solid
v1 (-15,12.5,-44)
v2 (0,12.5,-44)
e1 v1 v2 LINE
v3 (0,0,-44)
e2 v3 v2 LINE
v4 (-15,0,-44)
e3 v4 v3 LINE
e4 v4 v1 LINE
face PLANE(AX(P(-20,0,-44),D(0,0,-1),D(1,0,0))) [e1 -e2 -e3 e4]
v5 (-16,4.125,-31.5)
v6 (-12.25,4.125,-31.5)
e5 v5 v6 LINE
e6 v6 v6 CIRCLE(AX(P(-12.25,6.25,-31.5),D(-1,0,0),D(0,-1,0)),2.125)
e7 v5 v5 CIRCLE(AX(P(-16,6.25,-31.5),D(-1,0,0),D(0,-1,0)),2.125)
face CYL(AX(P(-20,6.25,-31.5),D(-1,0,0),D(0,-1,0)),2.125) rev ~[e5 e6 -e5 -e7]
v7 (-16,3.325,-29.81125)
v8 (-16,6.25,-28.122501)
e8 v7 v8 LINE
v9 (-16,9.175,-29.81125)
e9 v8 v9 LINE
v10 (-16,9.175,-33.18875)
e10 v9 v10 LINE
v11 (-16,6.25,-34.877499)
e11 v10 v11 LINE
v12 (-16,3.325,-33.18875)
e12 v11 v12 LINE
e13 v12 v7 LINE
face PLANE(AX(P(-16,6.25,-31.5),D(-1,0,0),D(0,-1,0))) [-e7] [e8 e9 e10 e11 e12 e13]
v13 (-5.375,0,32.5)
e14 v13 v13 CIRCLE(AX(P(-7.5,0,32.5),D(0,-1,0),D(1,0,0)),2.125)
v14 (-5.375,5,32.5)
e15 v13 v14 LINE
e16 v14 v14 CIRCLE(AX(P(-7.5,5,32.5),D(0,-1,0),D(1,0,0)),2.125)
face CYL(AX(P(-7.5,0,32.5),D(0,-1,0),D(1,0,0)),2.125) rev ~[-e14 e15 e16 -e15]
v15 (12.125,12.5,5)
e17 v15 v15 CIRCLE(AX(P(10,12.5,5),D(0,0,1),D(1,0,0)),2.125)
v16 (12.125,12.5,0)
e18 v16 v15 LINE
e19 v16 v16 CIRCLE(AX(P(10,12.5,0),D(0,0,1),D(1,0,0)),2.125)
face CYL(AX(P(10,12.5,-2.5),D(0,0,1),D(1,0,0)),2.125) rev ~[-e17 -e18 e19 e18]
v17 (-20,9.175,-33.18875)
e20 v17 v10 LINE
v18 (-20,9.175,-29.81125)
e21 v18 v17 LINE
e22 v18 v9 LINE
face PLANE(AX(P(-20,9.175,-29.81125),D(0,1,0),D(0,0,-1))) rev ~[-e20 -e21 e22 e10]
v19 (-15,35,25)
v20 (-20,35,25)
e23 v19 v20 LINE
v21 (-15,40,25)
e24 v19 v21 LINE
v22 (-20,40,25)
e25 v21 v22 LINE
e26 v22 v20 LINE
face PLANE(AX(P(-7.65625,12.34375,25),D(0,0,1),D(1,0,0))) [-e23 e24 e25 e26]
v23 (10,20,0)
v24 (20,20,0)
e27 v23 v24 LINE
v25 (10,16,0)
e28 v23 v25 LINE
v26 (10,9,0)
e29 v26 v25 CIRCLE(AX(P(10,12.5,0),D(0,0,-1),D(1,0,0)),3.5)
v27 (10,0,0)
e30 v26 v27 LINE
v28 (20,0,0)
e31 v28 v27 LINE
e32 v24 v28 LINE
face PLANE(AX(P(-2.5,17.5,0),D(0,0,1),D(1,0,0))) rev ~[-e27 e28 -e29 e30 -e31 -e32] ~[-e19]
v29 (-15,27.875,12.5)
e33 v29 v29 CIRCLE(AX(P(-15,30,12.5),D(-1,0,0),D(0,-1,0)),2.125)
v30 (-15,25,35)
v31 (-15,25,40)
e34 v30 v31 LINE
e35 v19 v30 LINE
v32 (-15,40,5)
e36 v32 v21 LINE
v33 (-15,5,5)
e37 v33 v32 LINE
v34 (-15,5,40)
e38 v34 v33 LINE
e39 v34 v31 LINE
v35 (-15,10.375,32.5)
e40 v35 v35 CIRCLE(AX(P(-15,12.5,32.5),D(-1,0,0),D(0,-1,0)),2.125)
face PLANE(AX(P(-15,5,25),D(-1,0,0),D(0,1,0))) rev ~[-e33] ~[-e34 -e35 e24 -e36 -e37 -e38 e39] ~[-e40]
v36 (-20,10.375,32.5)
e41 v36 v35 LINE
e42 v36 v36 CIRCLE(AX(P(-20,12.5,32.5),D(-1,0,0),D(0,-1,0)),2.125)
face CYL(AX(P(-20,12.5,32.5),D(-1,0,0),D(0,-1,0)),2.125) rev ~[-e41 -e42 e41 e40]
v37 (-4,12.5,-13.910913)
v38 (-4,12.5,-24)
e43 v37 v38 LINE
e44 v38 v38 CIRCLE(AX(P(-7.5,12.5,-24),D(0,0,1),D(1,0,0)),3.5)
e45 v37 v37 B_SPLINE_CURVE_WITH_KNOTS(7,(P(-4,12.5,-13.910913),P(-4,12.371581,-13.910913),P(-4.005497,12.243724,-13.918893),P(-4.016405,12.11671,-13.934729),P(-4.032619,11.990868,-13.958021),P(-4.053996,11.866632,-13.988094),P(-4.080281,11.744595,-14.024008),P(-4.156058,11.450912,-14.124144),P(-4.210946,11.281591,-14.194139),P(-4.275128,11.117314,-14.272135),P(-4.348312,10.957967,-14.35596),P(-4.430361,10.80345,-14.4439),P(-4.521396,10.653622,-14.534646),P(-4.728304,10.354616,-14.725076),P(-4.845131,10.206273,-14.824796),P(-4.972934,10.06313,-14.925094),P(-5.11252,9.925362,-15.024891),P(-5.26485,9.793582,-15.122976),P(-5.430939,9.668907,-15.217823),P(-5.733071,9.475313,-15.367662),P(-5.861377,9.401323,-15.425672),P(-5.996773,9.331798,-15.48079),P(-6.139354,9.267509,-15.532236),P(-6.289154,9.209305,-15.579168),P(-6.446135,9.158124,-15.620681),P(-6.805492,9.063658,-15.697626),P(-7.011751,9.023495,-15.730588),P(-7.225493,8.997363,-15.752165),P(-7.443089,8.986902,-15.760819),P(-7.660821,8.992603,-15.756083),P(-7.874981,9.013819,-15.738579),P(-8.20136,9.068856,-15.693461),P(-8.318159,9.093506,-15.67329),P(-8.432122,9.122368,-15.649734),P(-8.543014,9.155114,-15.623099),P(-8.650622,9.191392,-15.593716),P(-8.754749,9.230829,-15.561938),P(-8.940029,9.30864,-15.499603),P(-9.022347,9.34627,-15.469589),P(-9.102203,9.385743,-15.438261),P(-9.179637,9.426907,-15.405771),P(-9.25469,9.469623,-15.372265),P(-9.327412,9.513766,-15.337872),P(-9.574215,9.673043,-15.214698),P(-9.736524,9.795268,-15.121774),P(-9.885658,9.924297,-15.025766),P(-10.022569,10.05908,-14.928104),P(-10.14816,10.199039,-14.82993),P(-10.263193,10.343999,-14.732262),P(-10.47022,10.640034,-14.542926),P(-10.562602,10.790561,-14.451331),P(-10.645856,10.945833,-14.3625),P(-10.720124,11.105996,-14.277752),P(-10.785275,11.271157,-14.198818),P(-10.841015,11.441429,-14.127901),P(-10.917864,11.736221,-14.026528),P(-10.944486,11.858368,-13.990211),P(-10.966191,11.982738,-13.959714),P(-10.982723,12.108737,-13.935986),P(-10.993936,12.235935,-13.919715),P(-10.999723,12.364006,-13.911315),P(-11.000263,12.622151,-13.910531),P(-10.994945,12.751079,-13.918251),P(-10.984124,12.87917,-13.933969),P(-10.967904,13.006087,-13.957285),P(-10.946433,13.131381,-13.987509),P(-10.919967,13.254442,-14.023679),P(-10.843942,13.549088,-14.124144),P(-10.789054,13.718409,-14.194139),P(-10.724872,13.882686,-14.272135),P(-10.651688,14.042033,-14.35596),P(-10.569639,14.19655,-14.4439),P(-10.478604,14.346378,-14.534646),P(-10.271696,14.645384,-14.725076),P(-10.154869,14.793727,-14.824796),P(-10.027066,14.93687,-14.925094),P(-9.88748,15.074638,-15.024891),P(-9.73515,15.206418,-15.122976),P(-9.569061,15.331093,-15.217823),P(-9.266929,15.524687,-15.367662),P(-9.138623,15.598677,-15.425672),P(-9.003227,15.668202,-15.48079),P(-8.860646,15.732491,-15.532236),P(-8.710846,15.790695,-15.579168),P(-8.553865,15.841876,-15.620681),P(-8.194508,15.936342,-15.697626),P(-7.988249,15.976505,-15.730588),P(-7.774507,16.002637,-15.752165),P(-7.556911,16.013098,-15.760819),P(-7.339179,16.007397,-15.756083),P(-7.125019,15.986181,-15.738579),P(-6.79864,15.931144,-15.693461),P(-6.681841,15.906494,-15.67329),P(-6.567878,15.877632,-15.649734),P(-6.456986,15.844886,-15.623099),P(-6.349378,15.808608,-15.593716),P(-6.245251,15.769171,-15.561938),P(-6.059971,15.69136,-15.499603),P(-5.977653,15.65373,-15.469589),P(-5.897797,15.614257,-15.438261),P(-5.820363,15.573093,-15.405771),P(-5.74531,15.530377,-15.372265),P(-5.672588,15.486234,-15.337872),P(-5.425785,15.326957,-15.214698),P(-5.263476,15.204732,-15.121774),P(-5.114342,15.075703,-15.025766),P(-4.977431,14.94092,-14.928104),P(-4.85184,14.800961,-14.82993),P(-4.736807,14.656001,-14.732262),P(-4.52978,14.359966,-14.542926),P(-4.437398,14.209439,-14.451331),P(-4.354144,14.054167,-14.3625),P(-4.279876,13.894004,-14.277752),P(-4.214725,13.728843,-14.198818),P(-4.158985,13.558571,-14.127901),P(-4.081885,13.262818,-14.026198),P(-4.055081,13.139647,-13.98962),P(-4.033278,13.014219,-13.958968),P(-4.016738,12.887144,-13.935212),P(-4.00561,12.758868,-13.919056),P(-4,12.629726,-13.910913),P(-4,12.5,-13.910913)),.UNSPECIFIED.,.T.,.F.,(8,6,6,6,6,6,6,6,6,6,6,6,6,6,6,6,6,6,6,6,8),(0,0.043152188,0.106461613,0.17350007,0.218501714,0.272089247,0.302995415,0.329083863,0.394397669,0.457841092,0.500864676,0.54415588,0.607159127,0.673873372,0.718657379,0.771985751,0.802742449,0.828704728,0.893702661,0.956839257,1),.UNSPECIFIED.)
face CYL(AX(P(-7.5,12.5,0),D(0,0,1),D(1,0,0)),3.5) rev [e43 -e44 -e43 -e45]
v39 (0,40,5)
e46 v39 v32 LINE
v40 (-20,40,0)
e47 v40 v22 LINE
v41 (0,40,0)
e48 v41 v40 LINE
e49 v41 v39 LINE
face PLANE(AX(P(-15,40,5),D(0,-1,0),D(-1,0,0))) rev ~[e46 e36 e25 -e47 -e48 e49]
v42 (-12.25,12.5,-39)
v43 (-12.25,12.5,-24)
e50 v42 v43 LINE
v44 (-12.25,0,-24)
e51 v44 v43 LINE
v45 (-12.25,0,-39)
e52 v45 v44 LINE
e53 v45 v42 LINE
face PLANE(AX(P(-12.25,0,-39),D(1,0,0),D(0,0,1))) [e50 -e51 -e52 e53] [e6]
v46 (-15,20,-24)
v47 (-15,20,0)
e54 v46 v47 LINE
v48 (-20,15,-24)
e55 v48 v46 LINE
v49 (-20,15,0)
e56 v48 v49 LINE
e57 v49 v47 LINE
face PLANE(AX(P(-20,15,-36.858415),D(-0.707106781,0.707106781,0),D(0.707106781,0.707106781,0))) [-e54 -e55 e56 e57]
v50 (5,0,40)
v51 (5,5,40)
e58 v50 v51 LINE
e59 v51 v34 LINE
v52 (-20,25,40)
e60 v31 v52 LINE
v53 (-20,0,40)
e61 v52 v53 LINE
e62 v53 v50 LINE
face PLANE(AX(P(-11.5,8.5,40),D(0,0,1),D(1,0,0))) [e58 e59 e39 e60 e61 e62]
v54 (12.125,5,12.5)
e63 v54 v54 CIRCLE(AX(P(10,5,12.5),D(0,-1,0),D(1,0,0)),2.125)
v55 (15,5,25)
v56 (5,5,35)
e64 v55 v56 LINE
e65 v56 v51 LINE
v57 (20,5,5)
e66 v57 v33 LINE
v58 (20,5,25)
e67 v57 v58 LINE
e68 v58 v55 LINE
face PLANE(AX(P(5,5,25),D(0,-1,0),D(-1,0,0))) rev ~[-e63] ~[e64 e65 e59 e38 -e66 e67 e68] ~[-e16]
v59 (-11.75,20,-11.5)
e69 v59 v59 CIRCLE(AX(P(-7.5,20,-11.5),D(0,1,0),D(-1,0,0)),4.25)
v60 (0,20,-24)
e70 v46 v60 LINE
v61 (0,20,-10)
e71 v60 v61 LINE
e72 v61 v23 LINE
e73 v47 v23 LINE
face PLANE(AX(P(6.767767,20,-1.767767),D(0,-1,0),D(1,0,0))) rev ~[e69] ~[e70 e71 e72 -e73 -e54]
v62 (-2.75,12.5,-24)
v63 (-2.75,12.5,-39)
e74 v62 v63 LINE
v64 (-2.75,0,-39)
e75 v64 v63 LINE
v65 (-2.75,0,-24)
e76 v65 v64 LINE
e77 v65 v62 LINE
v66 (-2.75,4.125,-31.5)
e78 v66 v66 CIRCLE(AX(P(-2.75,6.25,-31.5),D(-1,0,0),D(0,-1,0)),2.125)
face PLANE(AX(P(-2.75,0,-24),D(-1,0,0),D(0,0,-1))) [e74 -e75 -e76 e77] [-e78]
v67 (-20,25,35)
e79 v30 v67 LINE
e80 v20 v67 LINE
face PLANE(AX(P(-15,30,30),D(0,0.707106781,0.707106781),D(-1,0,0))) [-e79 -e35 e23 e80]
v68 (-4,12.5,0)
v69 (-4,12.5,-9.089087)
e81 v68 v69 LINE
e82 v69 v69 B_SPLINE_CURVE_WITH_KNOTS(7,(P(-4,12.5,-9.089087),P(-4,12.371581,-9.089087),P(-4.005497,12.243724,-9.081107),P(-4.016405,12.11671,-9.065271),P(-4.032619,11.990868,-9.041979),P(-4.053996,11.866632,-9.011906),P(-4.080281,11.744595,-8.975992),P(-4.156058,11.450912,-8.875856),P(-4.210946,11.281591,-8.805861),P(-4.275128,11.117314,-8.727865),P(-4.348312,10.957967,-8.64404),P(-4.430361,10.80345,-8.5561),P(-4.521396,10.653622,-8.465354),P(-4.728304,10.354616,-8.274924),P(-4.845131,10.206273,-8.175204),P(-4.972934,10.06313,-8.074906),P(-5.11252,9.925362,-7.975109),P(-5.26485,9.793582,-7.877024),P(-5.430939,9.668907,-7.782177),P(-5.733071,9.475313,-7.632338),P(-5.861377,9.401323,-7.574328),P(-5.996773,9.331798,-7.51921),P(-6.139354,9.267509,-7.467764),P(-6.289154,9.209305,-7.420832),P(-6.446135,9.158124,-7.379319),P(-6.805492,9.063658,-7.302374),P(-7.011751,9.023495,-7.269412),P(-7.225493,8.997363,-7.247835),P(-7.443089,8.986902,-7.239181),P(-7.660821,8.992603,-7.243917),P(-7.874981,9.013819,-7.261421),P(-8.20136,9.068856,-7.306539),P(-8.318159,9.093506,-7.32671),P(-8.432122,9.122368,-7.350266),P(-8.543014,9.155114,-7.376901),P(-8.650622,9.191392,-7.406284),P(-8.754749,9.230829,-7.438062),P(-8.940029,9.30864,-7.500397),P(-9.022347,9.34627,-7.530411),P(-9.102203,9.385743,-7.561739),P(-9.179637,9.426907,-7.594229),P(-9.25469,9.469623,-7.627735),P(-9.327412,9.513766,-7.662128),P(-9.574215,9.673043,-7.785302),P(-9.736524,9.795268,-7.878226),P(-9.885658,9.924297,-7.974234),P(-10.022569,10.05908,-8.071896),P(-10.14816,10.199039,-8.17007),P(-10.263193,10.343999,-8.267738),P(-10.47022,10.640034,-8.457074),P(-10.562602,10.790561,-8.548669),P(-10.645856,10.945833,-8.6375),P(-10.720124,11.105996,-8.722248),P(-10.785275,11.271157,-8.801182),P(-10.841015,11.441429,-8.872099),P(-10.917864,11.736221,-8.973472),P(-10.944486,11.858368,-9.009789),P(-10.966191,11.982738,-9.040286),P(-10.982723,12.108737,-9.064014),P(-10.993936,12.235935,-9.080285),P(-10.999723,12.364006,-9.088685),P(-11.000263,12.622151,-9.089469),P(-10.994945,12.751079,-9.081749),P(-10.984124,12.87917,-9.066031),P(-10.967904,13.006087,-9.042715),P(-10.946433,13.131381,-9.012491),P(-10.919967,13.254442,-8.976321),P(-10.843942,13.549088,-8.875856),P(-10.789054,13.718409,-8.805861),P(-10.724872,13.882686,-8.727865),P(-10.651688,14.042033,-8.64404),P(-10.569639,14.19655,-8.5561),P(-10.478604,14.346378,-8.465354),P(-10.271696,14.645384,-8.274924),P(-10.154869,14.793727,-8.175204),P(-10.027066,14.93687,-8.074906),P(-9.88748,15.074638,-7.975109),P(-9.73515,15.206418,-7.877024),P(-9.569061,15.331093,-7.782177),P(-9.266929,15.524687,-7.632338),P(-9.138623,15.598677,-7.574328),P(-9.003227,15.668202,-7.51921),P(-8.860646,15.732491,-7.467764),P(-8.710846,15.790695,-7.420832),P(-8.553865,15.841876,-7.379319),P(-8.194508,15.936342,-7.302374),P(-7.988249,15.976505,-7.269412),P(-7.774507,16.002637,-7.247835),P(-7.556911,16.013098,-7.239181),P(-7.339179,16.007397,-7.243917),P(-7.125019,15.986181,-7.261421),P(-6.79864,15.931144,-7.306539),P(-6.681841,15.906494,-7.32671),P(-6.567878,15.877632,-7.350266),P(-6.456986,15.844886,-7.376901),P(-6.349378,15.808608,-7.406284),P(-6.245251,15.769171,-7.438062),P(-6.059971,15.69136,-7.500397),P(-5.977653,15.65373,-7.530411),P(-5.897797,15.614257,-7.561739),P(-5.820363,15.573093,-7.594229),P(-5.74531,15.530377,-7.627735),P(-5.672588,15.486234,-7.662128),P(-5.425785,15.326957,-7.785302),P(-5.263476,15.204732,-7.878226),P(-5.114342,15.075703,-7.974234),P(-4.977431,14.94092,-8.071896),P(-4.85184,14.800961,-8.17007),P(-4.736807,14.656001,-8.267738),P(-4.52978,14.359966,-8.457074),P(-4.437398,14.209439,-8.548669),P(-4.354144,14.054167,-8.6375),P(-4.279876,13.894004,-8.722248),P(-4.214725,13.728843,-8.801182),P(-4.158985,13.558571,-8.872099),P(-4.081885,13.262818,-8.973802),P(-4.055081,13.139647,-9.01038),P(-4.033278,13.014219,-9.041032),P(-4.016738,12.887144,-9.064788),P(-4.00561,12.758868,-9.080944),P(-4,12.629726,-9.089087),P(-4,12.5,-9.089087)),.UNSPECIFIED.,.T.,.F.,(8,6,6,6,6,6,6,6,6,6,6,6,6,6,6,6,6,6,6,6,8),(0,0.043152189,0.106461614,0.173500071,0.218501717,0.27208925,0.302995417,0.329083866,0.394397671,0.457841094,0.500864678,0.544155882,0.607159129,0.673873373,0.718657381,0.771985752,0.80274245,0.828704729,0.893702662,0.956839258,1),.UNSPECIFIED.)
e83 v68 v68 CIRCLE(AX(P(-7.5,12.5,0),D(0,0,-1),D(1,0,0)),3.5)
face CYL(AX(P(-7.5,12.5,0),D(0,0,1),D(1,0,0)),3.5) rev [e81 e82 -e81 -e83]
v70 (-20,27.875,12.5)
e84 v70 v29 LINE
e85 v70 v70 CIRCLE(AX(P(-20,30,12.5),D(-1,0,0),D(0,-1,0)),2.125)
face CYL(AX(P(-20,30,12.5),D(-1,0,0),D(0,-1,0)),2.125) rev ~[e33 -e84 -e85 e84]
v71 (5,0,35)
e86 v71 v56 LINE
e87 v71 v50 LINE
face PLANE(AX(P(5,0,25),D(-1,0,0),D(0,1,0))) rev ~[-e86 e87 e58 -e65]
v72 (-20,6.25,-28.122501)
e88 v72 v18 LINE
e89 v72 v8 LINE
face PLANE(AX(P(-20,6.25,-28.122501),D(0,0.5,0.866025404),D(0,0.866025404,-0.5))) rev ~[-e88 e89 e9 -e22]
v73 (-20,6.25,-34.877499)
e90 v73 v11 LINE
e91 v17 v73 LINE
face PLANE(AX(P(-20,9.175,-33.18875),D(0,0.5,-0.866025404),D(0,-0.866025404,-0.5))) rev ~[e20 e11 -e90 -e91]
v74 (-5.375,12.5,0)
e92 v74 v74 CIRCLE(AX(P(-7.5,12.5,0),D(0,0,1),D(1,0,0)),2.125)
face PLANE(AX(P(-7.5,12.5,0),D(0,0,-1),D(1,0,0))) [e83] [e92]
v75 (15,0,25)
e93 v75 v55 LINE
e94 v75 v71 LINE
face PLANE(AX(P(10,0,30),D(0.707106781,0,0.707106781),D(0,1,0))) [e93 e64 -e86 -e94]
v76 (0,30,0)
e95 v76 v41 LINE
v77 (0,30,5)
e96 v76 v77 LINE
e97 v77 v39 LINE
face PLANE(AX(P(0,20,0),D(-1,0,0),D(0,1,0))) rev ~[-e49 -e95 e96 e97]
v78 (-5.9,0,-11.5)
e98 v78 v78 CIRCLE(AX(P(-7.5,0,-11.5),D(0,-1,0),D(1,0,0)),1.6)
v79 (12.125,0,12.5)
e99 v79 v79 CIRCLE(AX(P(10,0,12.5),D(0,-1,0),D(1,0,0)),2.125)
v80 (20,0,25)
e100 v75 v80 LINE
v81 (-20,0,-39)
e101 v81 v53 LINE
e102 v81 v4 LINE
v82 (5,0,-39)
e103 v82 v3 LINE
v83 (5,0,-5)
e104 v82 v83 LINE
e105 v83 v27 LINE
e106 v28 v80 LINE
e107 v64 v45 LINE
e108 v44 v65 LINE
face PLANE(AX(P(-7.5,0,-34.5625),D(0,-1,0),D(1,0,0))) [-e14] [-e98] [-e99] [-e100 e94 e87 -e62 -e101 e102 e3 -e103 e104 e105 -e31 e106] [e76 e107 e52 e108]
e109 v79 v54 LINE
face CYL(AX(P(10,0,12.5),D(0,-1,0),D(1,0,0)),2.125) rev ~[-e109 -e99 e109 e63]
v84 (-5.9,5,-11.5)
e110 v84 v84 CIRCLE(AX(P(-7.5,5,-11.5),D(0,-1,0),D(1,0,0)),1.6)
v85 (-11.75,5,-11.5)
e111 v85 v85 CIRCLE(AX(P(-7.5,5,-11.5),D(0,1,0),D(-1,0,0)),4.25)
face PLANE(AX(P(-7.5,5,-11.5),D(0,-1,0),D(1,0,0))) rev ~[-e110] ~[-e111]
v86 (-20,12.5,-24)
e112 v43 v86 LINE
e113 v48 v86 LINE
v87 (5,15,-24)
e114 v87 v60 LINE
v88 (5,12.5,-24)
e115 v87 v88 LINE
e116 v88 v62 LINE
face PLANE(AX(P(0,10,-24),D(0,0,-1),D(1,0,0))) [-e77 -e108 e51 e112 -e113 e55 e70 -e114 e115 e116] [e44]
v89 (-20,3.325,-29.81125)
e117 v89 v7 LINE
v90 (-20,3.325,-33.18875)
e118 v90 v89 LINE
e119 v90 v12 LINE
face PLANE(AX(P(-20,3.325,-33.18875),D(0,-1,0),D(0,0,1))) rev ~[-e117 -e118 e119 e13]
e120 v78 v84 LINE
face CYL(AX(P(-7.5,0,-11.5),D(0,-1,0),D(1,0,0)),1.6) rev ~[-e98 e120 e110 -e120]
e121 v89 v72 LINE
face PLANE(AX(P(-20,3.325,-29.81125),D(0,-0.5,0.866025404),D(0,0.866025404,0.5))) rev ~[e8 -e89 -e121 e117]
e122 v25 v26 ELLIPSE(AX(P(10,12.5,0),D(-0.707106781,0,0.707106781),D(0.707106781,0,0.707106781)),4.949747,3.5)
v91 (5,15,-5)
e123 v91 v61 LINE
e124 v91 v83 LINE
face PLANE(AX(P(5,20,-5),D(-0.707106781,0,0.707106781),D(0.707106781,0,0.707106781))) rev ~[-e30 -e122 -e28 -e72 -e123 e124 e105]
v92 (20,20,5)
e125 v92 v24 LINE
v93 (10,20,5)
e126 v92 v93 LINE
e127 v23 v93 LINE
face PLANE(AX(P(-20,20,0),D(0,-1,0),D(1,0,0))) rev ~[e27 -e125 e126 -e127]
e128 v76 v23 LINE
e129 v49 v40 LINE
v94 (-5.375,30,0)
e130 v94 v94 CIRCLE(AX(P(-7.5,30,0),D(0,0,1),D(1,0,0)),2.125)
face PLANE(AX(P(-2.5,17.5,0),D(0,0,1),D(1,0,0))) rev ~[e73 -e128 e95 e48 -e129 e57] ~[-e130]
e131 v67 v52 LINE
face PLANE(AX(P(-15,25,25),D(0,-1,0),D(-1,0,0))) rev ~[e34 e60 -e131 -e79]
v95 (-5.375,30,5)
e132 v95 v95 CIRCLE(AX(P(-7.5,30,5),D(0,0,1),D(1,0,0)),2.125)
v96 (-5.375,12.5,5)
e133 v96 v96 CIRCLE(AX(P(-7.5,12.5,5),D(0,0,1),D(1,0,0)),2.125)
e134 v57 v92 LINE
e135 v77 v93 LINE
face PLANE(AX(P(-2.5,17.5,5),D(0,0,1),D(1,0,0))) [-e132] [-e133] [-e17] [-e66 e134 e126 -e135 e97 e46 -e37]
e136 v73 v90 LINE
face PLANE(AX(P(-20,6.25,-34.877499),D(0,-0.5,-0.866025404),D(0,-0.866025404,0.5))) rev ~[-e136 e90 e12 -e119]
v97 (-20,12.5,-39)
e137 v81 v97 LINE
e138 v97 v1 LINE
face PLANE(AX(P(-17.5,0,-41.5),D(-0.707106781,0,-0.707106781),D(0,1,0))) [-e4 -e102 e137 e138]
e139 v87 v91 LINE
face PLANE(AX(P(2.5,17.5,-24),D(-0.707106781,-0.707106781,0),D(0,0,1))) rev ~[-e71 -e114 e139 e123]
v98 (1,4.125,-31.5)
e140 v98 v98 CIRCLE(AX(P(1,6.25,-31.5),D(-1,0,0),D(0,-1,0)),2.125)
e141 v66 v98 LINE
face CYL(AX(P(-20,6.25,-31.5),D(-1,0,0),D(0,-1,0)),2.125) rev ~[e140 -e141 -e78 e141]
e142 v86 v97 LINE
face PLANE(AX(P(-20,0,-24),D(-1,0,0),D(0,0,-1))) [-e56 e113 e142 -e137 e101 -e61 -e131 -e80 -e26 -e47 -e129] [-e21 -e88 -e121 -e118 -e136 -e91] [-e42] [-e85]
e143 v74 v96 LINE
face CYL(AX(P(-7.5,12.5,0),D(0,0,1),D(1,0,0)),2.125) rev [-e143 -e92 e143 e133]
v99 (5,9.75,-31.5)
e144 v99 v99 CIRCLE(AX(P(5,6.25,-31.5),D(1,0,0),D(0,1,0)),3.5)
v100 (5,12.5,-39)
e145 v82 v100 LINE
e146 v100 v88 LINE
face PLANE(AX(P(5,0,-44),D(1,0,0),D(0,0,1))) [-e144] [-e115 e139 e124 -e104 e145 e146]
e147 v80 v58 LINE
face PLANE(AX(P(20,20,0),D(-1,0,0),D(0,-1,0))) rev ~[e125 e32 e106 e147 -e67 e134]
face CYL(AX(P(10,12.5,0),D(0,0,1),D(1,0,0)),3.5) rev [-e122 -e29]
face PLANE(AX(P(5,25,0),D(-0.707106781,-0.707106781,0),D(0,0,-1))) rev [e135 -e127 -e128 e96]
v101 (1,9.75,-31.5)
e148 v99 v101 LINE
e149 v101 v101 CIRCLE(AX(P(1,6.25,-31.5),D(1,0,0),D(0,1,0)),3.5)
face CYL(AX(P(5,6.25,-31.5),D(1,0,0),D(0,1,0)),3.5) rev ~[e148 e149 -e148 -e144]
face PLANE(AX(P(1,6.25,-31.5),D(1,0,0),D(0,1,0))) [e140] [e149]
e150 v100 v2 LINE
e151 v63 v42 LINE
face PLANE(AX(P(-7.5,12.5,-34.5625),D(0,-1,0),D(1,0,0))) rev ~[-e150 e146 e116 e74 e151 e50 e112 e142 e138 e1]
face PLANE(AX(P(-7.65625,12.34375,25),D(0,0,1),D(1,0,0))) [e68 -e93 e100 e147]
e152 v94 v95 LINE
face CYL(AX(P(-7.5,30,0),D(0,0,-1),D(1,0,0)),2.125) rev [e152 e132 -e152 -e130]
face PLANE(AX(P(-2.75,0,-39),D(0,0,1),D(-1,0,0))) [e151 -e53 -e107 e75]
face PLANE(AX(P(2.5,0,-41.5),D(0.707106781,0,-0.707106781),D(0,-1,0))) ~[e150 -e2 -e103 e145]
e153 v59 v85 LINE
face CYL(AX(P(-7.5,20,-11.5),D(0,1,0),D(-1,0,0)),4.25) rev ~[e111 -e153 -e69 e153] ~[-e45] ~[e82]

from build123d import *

# Parameters (mm, degrees)
F0_R         = 2.125
F1_DEPTH     = 5
F3_DEPTH     = 20
F5_DEPTH     = 15
F6_SIZE      = 10
F7_R         = 2.125
F8_DEPTH     = 5
F9_R         = 2.125
F10_DEPTH    = 5
F11_W        = 40
F11_H        = 20
F11_R        = 2.125
F12_DEPTH    = 24
F13_R        = 4.25
F14_DEPTH    = 25
F15_R        = 3.5
F16_DEPTH    = 25
F17_R        = 4.25
F17_R_2      = 1.6
F18_DEPTH    = 5
F19_T4_DEPTH = 20
F19_S5_R     = 2.125
F19_T6_DEPTH = 12
F19_T7_DEPTH = 36.8584149398
F21_DEPTH    = 12.5
F22_SIZE     = 5
F23_R        = 3.5
F24_DEPTH    = 44.001
F25_R        = 2.125
F26_DEPTH    = 40.001
F28_DEPTH    = 4
F29_R        = 3.5
F30_DEPTH    = 4


# Not quite as in the source:
# - a fillet or chamfer that OpenCascade refuses, or shapes differently, is made with other operations: its cross-section is extruded or revolved along the edge and cut away or added


with BuildPart() as f1:
    # F0 (on Top) → F1 (new body)
    with BuildSketch(Plane.XY):
        Polygon((0, 20), (0, 40), (-20, 40), (-20, 0), (20, 0), (20, 20), align=None)
        with Locations((-7.5, 12.5)):
            Circle(F0_R, mode=Mode.SUBTRACT)
        with Locations((10, 12.5)):
            Circle(F0_R, mode=Mode.SUBTRACT)
        with Locations((-7.5, 30)):
            Circle(F0_R, mode=Mode.SUBTRACT)
    extrude(amount=F1_DEPTH)

    # F2 (on face) → F3 (join)
    with BuildSketch(Plane.XY.offset(5)):
        Polygon((-15, 40), (-20, 40), (-20, 0), (20, 0), (20, 5), (-15, 5), align=None)
    extrude(amount=F3_DEPTH)

    # F4 (on face) → F5 (join)
    with BuildSketch(Plane.XY.offset(25)):
        Polygon((-15, 5), (-15, 25), (-20, 25), (-20, 0), (5, 0), (5, 5), align=None)
    extrude(amount=F5_DEPTH)

    # F6
    f6_edges = [f1.edges().sort_by_distance(p)[0] for p in [
        (0, 20, 2.5),
        (-17.5, 25, 25),
        (5, 2.5, 25),
    ]]
    chamfer(f6_edges, length=F6_SIZE)

    # F7 (on face) → F8 (cut)
    with BuildSketch(Plane.XZ):
        with Locations((-7.5, 32.5)):
            Circle(F7_R)
        with Locations((10, 12.5)):
            Circle(F7_R)
    extrude(amount=-F8_DEPTH, mode=Mode.SUBTRACT)

    # F9 (on face) → F10 (cut)
    with BuildSketch(Plane(origin=(-20, 0, 0), x_dir=(0, -1, 0), z_dir=(-1, 0, 0))):
        with Locations((-12.5, 32.5)):
            Circle(F9_R)
        with Locations((-30, 12.5)):
            Circle(F9_R)
    extrude(amount=-F10_DEPTH, mode=Mode.SUBTRACT)

    # F11 (on face) → F12 (join)
    with BuildSketch(Plane(origin=(0, 0, 0), x_dir=(1, 0, 0), z_dir=(0, 0, -1))):
        with Locations((0, -10)):
            Rectangle(F11_W, F11_H)
        with Locations((-7.5, -12.5)):
            Circle(F11_R, mode=Mode.SUBTRACT)
        with Locations((10, -12.5)):
            Circle(F11_R, mode=Mode.SUBTRACT)
    extrude(amount=F12_DEPTH)

    # F13 (on face) → F14 (cut)
    with BuildSketch(Plane(origin=(0, 20, 0), x_dir=(-1, 0, 0), z_dir=(0, 1, 0))):
        with Locations((7.5, -11.5)):
            Circle(F13_R)
        Polygon((-5, -24), (-5, -11.5), (-5, 0), (-20, 0), (-20, -24), align=None)
    extrude(amount=-F14_DEPTH, mode=Mode.SUBTRACT)

    # F15 (on face) → F16 (cut)
    with BuildSketch(Plane(origin=(0, 0, 0), x_dir=(1, 0, 0), z_dir=(0, 0, -1))):
        with Locations((-7.5, -12.5)):
            Circle(F15_R)
    extrude(amount=F16_DEPTH, mode=Mode.SUBTRACT)

    # F17 (on face) → F18 (join)
    with BuildSketch(Plane.XZ):
        with Locations((-7.5, -11.5)):
            Circle(F17_R)
        with Locations((-7.5, -11.5)):
            Circle(F17_R_2, mode=Mode.SUBTRACT)
    extrude(amount=-F18_DEPTH)

    # F19: chamfer of 5 on 2 edges, made by hand


with BuildPart() as f19_tool2:
    # F19_s3 → F19_t4 (new body)
    with BuildSketch(Plane.XZ.offset(-20)):
        Polygon((5, -5), (10, 0), (5, 0), align=None)
    extrude(amount=F19_T4_DEPTH)

    # F19_s5 → F19_t6 (cut, symmetric)
    with BuildSketch(Plane.XY.offset(-2.5)):
        with Locations((10, 12.5)):
            Circle(F19_S5_R)
    extrude(amount=F19_T6_DEPTH, both=True, mode=Mode.SUBTRACT)


with BuildPart() as f1_1:
    add(f1.part)

    # F19_t1: union F19_tool2
    add(f19_tool2.part)

    # F19_s8 → F19_t7 (cut)
    with BuildSketch(Plane.XY.offset(-36.8584149398)):
        Polygon((-20, 15), (-15, 20), (-20, 20), align=None)
    extrude(amount=F19_T7_DEPTH, mode=Mode.SUBTRACT)

    # F20 (on face) → F21 (join)
    with BuildSketch(Plane.XZ):
        Polygon((-12.25, -24), (-20, -24), (-20, -44), (5, -44), (5, -24), (-2.75, -24), (-2.75, -39), (-12.25, -39), align=None)
    extrude(amount=-F21_DEPTH)

    # F22
    f22_edges = [f1_1.edges().sort_by_distance(p)[0] for p in [
        (-20, 6.25, -44),
        (5, 6.25, -44),
        (5, 20, -14.5),
    ]]
    chamfer(f22_edges, length=F22_SIZE)

    # F23 (on face) → F24 (cut, through all)
    with BuildSketch(Plane(origin=(0, 0, 0), x_dir=(1, 0, 0), z_dir=(0, 0, -1))):
        with Locations((10, -12.5)):
            Circle(F23_R)
    extrude(amount=F24_DEPTH, mode=Mode.SUBTRACT)

    # F25 (on face) → F26 (cut, through all)
    with BuildSketch(Plane(origin=(-20, 0, 0), x_dir=(0, -1, 0), z_dir=(-1, 0, 0))):
        with Locations((-6.25, -31.5)):
            Circle(F25_R)
    extrude(amount=-F26_DEPTH, mode=Mode.SUBTRACT)

    # F27 (on face) → F28 (cut)
    with BuildSketch(Plane(origin=(-20, 0, 0), x_dir=(0, -1, 0), z_dir=(-1, 0, 0))):
        Polygon((-3.325, -33.1887495374), (-3.325, -29.8112504626), (-6.25, -28.1225009252), (-9.175, -29.8112504626), (-9.175, -33.1887495374), (-6.25, -34.8774990748), align=None)
    extrude(amount=-F28_DEPTH, mode=Mode.SUBTRACT)

    # F29 (on face) → F30 (cut)
    with BuildSketch(Plane.YZ.offset(5)):
        with Locations((6.25, -31.5)):
            Circle(F29_R)
    extrude(amount=-F30_DEPTH, mode=Mode.SUBTRACT)


solid = f1_1.part
